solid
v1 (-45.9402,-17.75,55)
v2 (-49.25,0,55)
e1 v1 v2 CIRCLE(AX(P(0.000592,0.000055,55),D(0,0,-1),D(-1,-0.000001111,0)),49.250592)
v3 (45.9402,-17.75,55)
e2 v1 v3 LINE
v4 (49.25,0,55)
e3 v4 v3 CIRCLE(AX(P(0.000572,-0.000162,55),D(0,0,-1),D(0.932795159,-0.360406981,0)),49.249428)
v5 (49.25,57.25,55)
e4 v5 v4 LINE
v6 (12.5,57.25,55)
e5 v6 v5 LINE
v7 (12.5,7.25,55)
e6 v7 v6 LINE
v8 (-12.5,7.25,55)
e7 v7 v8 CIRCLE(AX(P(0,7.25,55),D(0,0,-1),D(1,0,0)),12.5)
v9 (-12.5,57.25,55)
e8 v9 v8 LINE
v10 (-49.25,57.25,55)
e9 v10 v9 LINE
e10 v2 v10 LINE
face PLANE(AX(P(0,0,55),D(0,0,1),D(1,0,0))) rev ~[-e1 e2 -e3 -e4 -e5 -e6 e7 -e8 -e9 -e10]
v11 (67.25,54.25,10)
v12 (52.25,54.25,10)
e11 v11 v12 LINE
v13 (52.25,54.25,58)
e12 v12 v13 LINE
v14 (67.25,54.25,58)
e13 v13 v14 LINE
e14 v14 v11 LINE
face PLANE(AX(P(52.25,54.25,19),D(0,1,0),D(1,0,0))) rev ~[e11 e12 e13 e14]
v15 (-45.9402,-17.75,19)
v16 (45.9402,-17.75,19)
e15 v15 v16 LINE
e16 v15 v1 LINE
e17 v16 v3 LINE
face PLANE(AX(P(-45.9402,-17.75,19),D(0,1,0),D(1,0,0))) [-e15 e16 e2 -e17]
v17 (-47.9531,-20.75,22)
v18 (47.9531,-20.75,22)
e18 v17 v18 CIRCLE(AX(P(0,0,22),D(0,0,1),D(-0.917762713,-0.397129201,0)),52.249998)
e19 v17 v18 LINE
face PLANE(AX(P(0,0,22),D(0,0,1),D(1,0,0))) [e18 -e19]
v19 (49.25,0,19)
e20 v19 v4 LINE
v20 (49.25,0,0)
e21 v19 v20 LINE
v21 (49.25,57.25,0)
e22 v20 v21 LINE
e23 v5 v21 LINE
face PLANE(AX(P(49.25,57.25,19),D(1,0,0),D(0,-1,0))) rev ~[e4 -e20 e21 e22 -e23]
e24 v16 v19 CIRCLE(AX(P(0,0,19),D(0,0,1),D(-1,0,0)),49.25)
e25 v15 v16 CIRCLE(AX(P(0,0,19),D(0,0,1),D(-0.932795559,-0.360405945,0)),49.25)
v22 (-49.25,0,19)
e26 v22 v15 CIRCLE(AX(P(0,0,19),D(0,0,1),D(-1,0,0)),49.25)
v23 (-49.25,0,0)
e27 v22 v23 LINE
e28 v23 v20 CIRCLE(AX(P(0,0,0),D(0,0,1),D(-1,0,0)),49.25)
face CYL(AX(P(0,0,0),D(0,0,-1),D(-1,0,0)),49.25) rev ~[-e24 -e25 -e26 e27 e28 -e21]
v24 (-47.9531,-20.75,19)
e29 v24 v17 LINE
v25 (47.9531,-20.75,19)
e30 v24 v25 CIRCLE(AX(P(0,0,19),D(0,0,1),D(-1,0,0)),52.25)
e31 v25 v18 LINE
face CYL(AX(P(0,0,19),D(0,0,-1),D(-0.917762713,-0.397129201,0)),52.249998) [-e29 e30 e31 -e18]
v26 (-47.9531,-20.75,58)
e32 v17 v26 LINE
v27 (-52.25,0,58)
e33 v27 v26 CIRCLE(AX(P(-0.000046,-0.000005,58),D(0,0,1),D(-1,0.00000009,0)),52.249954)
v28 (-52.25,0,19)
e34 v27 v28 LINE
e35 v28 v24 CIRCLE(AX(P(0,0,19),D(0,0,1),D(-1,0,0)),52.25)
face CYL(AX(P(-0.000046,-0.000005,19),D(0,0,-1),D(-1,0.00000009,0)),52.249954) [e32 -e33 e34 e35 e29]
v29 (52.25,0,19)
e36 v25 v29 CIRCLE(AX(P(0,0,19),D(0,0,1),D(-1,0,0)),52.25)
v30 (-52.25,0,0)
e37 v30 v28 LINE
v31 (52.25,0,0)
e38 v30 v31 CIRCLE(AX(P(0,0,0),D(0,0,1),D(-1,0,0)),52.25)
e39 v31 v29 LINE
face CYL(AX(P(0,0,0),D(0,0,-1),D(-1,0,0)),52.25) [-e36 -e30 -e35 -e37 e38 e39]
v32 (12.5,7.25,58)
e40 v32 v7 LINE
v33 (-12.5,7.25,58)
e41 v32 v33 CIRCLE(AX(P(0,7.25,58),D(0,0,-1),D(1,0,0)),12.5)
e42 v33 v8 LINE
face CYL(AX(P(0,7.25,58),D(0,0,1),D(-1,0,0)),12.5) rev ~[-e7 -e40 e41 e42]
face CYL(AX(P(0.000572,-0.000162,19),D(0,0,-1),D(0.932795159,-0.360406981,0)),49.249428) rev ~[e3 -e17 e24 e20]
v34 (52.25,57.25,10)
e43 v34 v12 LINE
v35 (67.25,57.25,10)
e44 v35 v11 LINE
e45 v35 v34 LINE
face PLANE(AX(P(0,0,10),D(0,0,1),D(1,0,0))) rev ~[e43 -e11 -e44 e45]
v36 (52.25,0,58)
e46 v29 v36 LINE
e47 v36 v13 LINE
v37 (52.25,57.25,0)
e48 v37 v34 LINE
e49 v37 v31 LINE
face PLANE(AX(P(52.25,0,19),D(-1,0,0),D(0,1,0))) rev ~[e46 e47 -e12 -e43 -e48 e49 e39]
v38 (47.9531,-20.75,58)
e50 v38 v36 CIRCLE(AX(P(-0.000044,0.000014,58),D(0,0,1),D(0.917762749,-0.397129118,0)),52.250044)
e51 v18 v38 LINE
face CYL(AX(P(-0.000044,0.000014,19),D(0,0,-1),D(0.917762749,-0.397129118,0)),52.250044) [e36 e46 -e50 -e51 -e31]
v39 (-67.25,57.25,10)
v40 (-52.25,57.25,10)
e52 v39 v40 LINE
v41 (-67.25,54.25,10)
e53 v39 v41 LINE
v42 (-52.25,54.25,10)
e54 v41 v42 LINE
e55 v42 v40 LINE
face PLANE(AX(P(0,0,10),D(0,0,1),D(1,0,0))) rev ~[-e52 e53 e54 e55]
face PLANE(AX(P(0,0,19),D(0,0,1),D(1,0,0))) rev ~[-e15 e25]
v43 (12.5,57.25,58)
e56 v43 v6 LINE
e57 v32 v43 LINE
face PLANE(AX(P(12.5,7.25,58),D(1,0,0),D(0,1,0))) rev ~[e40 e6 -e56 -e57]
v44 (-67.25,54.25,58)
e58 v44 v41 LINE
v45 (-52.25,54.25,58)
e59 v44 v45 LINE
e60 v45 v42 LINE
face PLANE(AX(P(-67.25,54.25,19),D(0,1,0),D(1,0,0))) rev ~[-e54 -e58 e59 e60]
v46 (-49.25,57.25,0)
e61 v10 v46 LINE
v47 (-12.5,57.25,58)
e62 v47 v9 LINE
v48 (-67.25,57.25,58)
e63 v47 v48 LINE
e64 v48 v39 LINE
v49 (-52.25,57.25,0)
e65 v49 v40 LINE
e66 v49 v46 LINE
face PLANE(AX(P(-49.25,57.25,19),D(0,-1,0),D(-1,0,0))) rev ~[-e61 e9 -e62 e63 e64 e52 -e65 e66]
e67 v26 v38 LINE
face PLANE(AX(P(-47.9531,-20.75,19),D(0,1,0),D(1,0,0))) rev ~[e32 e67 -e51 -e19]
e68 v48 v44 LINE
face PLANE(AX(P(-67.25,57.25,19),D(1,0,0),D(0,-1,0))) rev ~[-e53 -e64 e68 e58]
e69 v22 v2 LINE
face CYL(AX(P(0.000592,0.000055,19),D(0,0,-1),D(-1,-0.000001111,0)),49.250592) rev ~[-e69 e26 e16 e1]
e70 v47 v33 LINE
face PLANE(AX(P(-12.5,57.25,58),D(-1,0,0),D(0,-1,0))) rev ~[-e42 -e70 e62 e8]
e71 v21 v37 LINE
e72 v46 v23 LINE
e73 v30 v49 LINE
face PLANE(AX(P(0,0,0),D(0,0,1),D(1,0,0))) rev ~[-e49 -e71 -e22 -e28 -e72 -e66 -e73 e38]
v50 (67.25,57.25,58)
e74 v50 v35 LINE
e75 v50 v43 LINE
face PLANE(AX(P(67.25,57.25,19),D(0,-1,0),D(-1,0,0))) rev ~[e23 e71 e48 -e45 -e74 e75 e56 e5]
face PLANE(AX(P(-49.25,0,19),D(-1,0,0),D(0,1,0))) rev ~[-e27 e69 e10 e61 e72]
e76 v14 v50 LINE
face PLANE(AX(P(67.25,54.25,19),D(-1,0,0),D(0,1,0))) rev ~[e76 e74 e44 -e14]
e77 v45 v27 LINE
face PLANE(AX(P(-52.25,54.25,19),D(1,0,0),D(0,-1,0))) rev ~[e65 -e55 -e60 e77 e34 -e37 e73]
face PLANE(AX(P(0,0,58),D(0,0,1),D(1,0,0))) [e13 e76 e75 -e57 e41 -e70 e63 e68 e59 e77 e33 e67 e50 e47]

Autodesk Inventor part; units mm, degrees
ref_plane "YZ Plane" through (0, 0, 0) normal (1, 0, 0) x (0, 1, 0)
ref_plane "XZ Plane" through (0, 0, 0) normal (0, 1, 0) x (-1, 0, 0)
ref_plane "XY Plane" through (0, 0, 0) normal (0, 0, 1) x (1, 0, 0)
sketch "Boceto1" plane through (0, 0, 0) normal (0, 0, 1) x (1, 0, 0)
  arc A0 (-52.25, 0) -> (52.25, 0) centre (0, 0) ccw
  line L0 (-52.25, 0) -> (-52.25, 57.25)
  line L1 (-52.25, 57.25) -> (-49.25, 57.25)
  line L2 (52.25, 57.25) -> (52.25, 0)
  arc A1 (52.25, 0) -> (-52.25, 0) centre (0, 0) ccw construction
  line L3 (0, -52.25) -> (0, 57.25) construction
  line L4 (-49.25, 57.25) -> (-49.25, 0)
  arc A2 (-49.25, 0) -> (49.25, 0) centre (0, 0) ccw
  line L5 (49.25, 0) -> (49.25, 57.25)
  line L6 (49.25, 57.25) -> (-49.25, 57.25) construction
  line L7 (49.25, 57.25) -> (49.25, 57.25)
  line L8 (-49.25, 57.25) -> (-49.25, 57.25)
  line L9 (-49.25, 57.25) -> (0, 57.25) construction
  line L10 (0, 57.25) -> (49.25, 57.25) construction
  line L11 (49.25, 57.25) -> (52.25, 57.25)
  dimension "d0" = 104.5
  dimension "d2" = 109.5
  dimension "d3" = 3
extrude "Extrusión1" add sketch "Boceto1" along normal blind 10
sketch "Boceto2" plane through (0, 0, 10) normal (0, 0, 1) x (1, 0, 0)
  line L0 (49.25, 57.25) -> (49.25, 0) projected
  arc A0 (-49.25, 0) -> (49.25, 0) centre (0, 0) ccw projected
  line L1 (-49.25, 0) -> (-49.25, 57.25) projected
  line L2 (-49.25, 57.25) -> (-52.25, 57.25) projected
  line L3 (-52.25, 57.25) -> (-52.25, 0) projected
  arc A1 (-52.25, 0) -> (52.25, 0) centre (0, 0) ccw projected
  line L4 (52.25, 0) -> (52.25, 57.25) projected
  line L5 (52.25, 57.25) -> (49.25, 57.25) projected
  line L6 (-49.25, 57.25) -> (-52.25, 57.25) projected
  line L7 (-52.25, 57.25) -> (-67.25, 57.25)
  line L8 (-67.25, 57.25) -> (-67.25, 54.25)
  line L9 (-67.25, 54.25) -> (-52.25, 54.25)
  line L10 (-52.25, 54.25) -> (-52.25, 57.25)
  line L11 (52.25, 57.25) -> (49.25, 57.25) projected
  line L12 (52.25, 57.25) -> (67.25, 57.25)
  line L13 (67.25, 57.25) -> (67.25, 54.25)
  line L14 (67.25, 54.25) -> (52.25, 54.25)
  line L15 (52.25, 54.25) -> (52.25, 57.25)
  point P0 (49.5, 57.5)
  dimension "d6" = 15
  dimension "d7" = 3
  dimension "d8" = 15
  dimension "d9" = 3
extrude "Extrusión3" add sketch "Boceto2" along normal blind 9
sketch "Boceto3" plane through (0, 0, 19) normal (0, 0, 1) x (1, 0, 0)
  line L0 (-52.25, 54.25) -> (-52.25, 0) projected
  line L1 (-49.25, 0) -> (-49.25, 57.25) projected
  line L2 (-49.25, 57.25) -> (-67.25, 57.25) projected
  line L3 (-67.25, 54.25) -> (-52.25, 54.25) projected
  line L4 (-67.25, 57.25) -> (-67.25, 54.25) projected
  line L5 (49.25, 57.25) -> (49.25, 0) projected
  line L6 (52.25, 0) -> (52.25, 54.25) projected
  line L7 (52.25, 54.25) -> (67.25, 54.25) projected
  line L8 (67.25, 54.25) -> (67.25, 57.25) projected
  line L9 (67.25, 57.25) -> (49.25, 57.25) projected
  arc A0 (-52.25, 0) -> (52.25, 0) centre (0, 0) ccw construction
  line L10 (-47.9531, -20.75) -> (47.9531, -20.75)
  arc A1 (-52.25, 0) -> (-47.9531, -20.75) centre (0, 0) ccw
  arc A2 (47.9531, -20.75) -> (52.25, 0) centre (0, 0) ccw
  arc A3 (-49.25, 0) -> (-45.9402, -17.75) centre (0, 0) ccw
  arc A4 (44.6654, -20.75) -> (45.9402, -17.75) centre (0, 0) ccw construction
  line L11 (-49.1426, -17.75) -> (-45.9402, -17.75) construction
  arc A5 (-45.9402, -17.75) -> (-44.6654, -20.75) centre (0, 0) ccw construction
  line L12 (-45.9402, -17.75) -> (45.9402, -17.75)
  arc A6 (45.9402, -17.75) -> (49.25, 0) centre (0, 0) ccw
  line L13 (45.9402, -17.75) -> (49.1426, -17.75) construction
  dimension "d14" = 78
  dimension "d15" = 3
extrude "Extrusión4" add sketch "Boceto3" along normal blind 39
sketch "Boceto4" plane through (0, 0, 19) normal (0, 0, 1) x (1, 0, 0)
  arc A0 (-47.9531, -20.75) -> (47.9531, -20.75) centre (0, 0) ccw projected
  line L0 (-47.9531, -20.75) -> (47.9531, -20.75) projected
extrude "Extrusión5" add sketch "Boceto4" along normal blind 3
sketch "Boceto5" plane through (0, 0, 58) normal (0, 0, 1) x (1, 0, 0)
  line L0 (-52.25, 54.25) -> (-52.25, 0) projected
  arc A0 (-52.25, 0) -> (-47.9531, -20.75) centre (0, 0) ccw projected
  line L1 (-47.9531, -20.75) -> (47.9531, -20.75) projected
  arc A1 (47.9531, -20.75) -> (52.25, 0) centre (0, 0) ccw projected
  line L2 (52.25, 0) -> (52.25, 54.25) projected
  line L3 (-52.25, 57.25) -> (-52.25, 0) projected
  line L4 (-52.25, 54.25) -> (-52.25, 57.25)
  line L5 (-52.25, 57.25) -> (-12.5, 57.25)
  line L6 (-12.5, 57.25) -> (-12.5, 7.25)
  line L7 (0, -5.25) -> (0, -5.25)
  line L8 (12.5, 7.25) -> (12.5, 57.25)
  line L9 (12.5, 57.25) -> (52.25, 57.25)
  line L10 (52.25, 57.25) -> (52.25, 54.25)
  arc A2 (-12.5, 7.25) -> (0, -5.25) centre (0, 7.25) ccw
  arc A3 (0, -5.25) -> (12.5, 7.25) centre (0, 7.25) ccw
  point P0 (-12.5, -5.25)
  point P1 (12.5, -5.25)
  point P2 (0, -5.25)
  dimension "d20" = 25
  dimension "d22" = 12.5
  dimension "d23" = 12.5
  dimension "d24" = 50
extrude "Extrusión6" add sketch "Boceto5" against normal blind 3
properties part number "_3DPrint"
